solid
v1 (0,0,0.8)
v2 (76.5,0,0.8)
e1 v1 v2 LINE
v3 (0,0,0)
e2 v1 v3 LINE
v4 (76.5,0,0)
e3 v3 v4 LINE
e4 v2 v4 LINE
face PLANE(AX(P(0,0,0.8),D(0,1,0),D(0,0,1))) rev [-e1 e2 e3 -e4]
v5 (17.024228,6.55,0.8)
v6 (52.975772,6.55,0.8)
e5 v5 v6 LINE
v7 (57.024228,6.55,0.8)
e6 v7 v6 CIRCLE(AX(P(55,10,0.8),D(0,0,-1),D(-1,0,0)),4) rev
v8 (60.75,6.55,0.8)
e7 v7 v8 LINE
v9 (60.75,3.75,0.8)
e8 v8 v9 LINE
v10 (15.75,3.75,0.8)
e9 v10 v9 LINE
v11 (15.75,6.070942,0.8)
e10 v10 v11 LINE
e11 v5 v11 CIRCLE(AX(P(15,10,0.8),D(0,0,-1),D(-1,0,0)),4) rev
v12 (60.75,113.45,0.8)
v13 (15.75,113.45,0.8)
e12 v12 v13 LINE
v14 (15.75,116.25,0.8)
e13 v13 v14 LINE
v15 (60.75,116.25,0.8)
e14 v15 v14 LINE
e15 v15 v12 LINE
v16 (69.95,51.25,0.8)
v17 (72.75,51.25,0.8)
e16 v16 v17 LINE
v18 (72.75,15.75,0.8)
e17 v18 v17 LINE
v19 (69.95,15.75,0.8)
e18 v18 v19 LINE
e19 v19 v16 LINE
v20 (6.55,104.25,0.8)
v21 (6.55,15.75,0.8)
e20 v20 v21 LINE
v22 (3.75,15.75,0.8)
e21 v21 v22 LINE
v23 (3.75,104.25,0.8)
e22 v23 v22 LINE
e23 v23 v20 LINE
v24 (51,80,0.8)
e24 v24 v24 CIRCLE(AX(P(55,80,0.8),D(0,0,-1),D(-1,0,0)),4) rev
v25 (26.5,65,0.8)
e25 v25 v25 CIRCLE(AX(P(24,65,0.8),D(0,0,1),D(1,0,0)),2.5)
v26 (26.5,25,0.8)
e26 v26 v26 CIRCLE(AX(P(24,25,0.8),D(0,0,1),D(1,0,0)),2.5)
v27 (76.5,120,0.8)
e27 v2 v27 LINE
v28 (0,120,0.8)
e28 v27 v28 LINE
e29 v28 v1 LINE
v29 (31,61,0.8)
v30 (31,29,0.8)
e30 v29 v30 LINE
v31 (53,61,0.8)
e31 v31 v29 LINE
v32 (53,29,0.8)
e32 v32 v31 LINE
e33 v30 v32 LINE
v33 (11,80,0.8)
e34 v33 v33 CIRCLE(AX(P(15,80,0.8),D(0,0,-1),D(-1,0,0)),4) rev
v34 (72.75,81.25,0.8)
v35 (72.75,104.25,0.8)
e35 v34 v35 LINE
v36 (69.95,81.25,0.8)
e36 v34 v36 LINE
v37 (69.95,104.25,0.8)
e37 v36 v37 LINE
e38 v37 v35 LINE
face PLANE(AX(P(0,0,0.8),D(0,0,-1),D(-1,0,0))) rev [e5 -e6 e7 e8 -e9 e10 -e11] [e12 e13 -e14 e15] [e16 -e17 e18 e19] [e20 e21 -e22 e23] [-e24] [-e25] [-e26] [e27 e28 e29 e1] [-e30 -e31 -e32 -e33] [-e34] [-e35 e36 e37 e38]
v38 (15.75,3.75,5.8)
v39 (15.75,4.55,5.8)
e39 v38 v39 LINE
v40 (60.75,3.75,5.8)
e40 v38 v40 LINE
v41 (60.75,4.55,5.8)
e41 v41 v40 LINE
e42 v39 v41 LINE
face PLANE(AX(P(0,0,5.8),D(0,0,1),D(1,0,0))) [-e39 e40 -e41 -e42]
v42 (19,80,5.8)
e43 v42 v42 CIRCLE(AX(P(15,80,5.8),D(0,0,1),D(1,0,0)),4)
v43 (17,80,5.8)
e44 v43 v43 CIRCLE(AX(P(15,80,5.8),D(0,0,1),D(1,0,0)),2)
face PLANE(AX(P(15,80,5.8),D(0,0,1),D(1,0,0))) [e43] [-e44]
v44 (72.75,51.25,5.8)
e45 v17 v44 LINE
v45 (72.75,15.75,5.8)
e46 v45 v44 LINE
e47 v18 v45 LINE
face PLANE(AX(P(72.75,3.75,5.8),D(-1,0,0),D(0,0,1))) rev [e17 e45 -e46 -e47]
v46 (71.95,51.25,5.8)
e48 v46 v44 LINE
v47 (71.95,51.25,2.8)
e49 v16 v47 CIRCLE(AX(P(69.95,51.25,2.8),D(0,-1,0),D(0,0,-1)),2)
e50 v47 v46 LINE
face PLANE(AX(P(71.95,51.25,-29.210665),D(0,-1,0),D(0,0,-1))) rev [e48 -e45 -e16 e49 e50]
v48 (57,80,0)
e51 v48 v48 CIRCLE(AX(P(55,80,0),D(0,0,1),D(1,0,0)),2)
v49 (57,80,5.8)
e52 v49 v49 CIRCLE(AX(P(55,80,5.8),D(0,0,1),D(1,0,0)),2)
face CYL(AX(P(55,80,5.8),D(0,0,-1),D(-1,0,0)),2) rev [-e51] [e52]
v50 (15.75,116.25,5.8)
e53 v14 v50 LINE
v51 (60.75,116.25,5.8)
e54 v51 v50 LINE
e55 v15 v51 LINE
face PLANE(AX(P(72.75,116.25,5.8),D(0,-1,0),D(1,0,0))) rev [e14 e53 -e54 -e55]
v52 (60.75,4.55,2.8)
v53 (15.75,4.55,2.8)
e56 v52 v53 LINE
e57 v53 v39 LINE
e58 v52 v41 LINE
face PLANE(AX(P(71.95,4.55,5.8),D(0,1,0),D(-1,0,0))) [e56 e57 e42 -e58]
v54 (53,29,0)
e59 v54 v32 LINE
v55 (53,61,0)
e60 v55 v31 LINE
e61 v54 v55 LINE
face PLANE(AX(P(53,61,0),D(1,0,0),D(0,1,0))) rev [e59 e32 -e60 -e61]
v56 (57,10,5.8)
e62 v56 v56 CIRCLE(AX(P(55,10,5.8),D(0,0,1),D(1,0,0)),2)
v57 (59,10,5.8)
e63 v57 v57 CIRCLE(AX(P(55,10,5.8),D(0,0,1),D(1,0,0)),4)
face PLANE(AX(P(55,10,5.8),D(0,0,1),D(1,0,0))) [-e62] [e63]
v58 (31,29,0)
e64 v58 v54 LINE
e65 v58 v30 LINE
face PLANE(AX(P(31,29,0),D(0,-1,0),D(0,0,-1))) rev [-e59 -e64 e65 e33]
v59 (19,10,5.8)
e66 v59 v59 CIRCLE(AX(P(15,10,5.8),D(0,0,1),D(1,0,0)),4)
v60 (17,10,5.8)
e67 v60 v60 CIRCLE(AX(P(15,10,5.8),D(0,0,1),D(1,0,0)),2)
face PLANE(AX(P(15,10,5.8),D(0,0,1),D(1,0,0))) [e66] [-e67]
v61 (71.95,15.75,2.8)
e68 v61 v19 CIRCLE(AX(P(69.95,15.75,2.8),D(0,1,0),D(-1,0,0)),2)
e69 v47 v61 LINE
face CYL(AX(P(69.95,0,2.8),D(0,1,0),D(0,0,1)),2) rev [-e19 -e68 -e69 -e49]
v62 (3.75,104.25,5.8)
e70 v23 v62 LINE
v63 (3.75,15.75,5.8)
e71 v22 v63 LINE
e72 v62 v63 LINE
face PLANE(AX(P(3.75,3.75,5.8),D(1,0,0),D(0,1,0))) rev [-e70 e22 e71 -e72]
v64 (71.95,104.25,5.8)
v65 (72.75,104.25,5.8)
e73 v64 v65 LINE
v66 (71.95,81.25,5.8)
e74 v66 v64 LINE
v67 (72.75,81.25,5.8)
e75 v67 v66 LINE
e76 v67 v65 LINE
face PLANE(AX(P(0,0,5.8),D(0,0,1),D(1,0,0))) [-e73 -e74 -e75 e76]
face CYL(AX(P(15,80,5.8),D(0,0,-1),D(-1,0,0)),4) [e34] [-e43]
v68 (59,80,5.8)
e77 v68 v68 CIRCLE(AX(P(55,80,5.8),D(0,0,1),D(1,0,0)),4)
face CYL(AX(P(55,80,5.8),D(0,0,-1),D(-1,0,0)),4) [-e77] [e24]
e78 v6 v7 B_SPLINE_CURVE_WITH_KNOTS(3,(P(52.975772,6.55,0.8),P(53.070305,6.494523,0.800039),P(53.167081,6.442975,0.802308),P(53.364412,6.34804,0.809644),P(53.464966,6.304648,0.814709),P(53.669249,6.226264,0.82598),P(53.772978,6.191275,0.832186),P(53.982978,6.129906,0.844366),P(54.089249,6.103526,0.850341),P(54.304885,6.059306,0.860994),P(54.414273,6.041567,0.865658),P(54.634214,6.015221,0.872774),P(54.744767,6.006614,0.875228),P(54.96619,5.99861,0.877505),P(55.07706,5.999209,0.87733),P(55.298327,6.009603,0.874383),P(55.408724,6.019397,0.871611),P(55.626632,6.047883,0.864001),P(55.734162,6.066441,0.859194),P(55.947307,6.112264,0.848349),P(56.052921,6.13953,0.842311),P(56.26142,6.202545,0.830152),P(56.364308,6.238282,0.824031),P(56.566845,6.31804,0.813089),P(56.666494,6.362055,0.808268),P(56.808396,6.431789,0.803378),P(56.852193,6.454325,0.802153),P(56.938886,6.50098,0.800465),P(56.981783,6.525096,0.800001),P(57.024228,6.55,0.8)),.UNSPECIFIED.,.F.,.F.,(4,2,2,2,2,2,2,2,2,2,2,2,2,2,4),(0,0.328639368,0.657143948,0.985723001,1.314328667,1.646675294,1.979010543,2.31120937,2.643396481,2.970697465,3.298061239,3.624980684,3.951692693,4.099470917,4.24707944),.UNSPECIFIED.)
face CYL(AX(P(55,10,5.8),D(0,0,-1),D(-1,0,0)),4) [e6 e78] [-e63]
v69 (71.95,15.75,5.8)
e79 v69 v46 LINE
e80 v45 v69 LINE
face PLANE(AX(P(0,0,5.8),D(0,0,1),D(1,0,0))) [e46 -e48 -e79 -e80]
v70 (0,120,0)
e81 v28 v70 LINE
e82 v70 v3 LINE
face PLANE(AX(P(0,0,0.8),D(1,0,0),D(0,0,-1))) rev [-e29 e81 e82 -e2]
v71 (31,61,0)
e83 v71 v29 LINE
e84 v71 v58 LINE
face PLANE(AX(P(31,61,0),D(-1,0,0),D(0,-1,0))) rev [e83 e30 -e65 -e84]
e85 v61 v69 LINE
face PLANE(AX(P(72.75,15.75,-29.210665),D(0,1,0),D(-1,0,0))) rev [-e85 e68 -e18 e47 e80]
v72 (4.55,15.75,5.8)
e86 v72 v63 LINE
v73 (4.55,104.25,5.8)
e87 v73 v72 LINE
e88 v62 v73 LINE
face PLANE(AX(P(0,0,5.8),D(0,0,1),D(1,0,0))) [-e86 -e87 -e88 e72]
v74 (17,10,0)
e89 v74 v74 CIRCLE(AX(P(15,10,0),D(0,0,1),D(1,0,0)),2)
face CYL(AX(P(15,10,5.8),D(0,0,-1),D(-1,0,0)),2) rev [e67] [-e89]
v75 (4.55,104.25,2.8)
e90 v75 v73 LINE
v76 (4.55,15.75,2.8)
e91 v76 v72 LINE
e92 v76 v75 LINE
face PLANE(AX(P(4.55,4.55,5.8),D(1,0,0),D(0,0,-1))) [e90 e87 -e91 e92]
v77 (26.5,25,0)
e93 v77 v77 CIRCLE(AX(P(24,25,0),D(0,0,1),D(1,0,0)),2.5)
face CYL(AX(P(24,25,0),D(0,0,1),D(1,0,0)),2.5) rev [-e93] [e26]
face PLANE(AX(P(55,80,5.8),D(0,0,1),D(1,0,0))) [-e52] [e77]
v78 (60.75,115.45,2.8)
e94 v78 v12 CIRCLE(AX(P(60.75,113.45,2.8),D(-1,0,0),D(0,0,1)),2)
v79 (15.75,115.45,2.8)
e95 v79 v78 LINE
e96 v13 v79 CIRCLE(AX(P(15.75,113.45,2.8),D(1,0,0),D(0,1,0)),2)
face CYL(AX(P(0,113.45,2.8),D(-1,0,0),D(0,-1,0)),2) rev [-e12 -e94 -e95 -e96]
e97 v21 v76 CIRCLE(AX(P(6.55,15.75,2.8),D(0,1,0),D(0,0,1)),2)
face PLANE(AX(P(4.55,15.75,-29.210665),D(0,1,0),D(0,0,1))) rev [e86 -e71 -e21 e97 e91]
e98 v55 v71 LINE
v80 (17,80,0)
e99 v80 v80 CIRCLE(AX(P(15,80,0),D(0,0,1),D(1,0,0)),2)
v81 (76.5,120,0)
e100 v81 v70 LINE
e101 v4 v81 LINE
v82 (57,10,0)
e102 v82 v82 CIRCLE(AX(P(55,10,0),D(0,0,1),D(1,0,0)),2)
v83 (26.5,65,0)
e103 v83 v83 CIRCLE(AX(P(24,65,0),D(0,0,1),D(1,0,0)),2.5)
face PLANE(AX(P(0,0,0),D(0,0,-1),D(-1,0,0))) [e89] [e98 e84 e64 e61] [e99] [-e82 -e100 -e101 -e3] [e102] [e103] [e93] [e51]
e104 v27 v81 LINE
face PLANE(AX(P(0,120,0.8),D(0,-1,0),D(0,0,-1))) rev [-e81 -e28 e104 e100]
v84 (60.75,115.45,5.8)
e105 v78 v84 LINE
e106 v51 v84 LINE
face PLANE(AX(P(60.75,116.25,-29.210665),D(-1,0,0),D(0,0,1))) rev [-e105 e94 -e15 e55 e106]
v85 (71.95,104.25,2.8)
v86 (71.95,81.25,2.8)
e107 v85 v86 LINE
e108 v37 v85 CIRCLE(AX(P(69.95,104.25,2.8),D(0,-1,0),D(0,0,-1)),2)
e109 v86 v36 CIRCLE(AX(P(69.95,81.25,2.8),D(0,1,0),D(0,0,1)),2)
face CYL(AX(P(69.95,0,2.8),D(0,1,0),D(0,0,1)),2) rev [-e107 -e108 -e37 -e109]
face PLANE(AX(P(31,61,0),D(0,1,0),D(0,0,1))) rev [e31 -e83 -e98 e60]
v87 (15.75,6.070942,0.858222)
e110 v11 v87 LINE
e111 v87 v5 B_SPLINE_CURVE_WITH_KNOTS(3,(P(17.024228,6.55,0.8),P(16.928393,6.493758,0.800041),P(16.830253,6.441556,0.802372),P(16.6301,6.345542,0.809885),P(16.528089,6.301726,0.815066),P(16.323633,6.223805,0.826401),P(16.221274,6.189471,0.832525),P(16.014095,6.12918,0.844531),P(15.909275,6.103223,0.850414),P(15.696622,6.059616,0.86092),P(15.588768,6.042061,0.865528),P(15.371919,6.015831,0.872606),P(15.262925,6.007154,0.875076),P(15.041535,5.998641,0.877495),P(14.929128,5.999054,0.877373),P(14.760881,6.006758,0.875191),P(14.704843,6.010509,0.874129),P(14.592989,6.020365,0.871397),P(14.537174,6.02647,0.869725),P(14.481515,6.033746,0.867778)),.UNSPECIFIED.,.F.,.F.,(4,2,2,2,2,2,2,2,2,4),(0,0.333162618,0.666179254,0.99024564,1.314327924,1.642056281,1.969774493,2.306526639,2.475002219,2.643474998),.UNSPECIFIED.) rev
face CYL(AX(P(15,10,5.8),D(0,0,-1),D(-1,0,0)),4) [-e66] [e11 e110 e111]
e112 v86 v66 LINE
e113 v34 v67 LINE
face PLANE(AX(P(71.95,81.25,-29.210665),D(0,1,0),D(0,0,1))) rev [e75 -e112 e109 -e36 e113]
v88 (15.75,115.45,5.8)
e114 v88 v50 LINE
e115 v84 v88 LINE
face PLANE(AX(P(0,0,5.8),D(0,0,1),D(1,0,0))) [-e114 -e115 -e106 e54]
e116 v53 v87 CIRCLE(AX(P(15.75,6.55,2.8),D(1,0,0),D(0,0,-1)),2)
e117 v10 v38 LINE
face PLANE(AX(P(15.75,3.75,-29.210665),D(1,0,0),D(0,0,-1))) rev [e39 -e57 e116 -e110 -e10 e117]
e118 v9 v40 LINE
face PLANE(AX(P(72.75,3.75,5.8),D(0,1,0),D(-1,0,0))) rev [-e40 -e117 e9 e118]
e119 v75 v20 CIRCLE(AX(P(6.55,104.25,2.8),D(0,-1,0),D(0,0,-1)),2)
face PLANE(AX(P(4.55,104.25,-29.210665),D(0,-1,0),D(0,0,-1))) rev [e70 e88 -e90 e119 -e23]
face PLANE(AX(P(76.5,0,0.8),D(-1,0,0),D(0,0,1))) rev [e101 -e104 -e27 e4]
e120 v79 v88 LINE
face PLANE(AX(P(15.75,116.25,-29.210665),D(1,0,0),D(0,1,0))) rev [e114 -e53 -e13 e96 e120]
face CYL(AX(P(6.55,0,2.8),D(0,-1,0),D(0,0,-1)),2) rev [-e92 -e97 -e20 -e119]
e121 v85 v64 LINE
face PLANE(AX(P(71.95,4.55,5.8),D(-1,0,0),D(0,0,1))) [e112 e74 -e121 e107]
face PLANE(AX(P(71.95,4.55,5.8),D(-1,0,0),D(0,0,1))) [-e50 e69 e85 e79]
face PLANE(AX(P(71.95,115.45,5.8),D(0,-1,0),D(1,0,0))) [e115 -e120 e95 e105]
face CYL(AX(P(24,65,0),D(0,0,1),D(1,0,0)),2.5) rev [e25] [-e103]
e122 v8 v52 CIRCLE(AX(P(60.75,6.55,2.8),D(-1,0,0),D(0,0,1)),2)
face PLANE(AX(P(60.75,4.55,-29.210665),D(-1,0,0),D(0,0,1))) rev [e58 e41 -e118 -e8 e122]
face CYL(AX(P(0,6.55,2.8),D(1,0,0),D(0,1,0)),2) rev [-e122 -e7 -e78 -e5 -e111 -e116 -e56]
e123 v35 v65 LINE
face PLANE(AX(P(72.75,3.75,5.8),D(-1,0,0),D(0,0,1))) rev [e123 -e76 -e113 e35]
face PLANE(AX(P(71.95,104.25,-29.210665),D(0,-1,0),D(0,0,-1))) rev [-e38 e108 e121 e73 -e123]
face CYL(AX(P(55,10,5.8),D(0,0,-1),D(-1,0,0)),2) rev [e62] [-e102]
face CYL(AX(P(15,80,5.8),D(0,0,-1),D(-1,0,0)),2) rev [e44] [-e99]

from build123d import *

# Parameters (mm, degrees)
SKETCH_1_W          = 76.5
SKETCH_1_H          = 120
EXTRUDE_1_DEPTH     = 0.8
SKETCH_5_R          = 2.5
CUT_EXTRUDE_2_DEPTH = 143.31264877
SKETCH_7_R          = 4
SKETCH_7_R_2        = 2
EXTRUDE_2_DEPTH     = 5
SKETCH_8_W          = 22
SKETCH_8_H          = 32
CUT_EXTRUDE_4_DEPTH = 143.398209258
SKETCH_9_R          = 2
CUT_EXTRUDE_5_DEPTH = 143.398209258
SKETCH_10_W         = 69
SKETCH_10_H         = 112.5
SKETCH_10_W_2       = 67.4
SKETCH_10_H_2       = 110.9
EXTRUDE_4_DEPTH     = 5
SKETCH_11_W         = 0.8
SKETCH_11_H         = 30
CUT_EXTRUDE_6_DEPTH = 5
FILLET_1_R          = 2


with BuildPart() as part:
    # ｽｹｯﾁ1 → ﾎﾞｽ - 押し出し1 (new body)
    with BuildSketch(Plane.XY):
        with Locations((38.25, 60)):
            Rectangle(SKETCH_1_W, SKETCH_1_H)
    extrude(amount=EXTRUDE_1_DEPTH)

    # ｽｹｯﾁ5 → ｶｯﾄ - 押し出し2 (cut, through all)
    with BuildSketch(Plane.XY.offset(0.8)):
        with Locations((24, 65)):
            Circle(SKETCH_5_R)
        with Locations((24, 25)):
            Circle(SKETCH_5_R)
    extrude(amount=-CUT_EXTRUDE_2_DEPTH, mode=Mode.SUBTRACT)

    # ｽｹｯﾁ7 → ﾎﾞｽ - 押し出し2 (add)
    # profile 1 of 4: a face of its own
    with BuildSketch(Plane.XY.offset(0.8)):
        with Locations(Location((55, 80, 0), (0, 0, 180))):
            Circle(SKETCH_7_R)
        with Locations((55, 80)):
            Circle(SKETCH_7_R_2, mode=Mode.SUBTRACT)
    # profile 2 of 4: a face of its own
    with BuildSketch(Plane.XY.offset(0.8)):
        with Locations(Location((15, 80, 0), (0, 0, 180))):
            Circle(SKETCH_7_R)
        with Locations((15, 80)):
            Circle(SKETCH_7_R_2, mode=Mode.SUBTRACT)
    # profile 3 of 4: a face of its own
    with BuildSketch(Plane.XY.offset(0.8)):
        with Locations(Location((55, 10, 0), (0, 0, 180))):
            Circle(SKETCH_7_R)
        with Locations((55, 10)):
            Circle(SKETCH_7_R_2, mode=Mode.SUBTRACT)
    # profile 4 of 4: a face of its own
    with BuildSketch(Plane.XY.offset(0.8)):
        with Locations(Location((15, 10, 0), (0, 0, 180))):
            Circle(SKETCH_7_R)
        with Locations((15, 10)):
            Circle(SKETCH_7_R_2, mode=Mode.SUBTRACT)
    extrude(amount=EXTRUDE_2_DEPTH)

    # ｽｹｯﾁ8 → ｶｯﾄ - 押し出し4 (cut, through all)
    with BuildSketch(Plane.XY.offset(0.8)):
        with Locations((42, 45)):
            Rectangle(SKETCH_8_W, SKETCH_8_H)
    extrude(amount=-CUT_EXTRUDE_4_DEPTH, mode=Mode.SUBTRACT)

    # ｽｹｯﾁ9 → ｶｯﾄ - 押し出し5 (cut, through all)
    with BuildSketch(Plane.XY.offset(0.8)):
        with Locations((15, 80)):
            Circle(SKETCH_9_R)
        with Locations((55, 80)):
            Circle(SKETCH_9_R)
        with Locations((55, 10)):
            Circle(SKETCH_9_R)
        with Locations((15, 10)):
            Circle(SKETCH_9_R)
    extrude(amount=-CUT_EXTRUDE_5_DEPTH, mode=Mode.SUBTRACT)

    # ｽｹｯﾁ10 → ﾎﾞｽ - 押し出し4 (add)
    with BuildSketch(Plane.XY.offset(0.8)):
        with Locations((38.25, 60)):
            Rectangle(SKETCH_10_W, SKETCH_10_H)
        with Locations((38.25, 60)):
            Rectangle(SKETCH_10_W_2, SKETCH_10_H_2, mode=Mode.SUBTRACT)
    extrude(amount=EXTRUDE_4_DEPTH)

    # ｽｹｯﾁ11 → ｶｯﾄ - 押し出し6 (cut)
    with BuildSketch(Plane.XY.offset(5.8)):
        with Locations((72.35, 66.25)):
            Rectangle(SKETCH_11_W, SKETCH_11_H)
        Polygon((3.75, 116.25), (15.75, 116.25), (15.75, 115.45), (4.55, 115.45), (4.55, 104.25), (3.75, 104.25), align=None)
        Polygon((72.75, 104.25), (72.75, 116.25), (60.75, 116.25), (60.75, 115.45), (71.95, 115.45), (71.95, 104.25), align=None)
        Polygon((72.75, 3.75), (72.75, 15.75), (71.95, 15.75), (71.95, 4.55), (60.75, 4.55), (60.75, 3.75), align=None)
        Polygon((3.75, 3.75), (15.75, 3.75), (15.75, 4.55), (4.55, 4.55), (4.55, 15.75), (3.75, 15.75), align=None)
    extrude(amount=-CUT_EXTRUDE_6_DEPTH, mode=Mode.SUBTRACT)

    # ﾌｨﾚｯﾄ1
    # the kernel refuses this fillet: 2 mm, written as the material it adds along each edge
    with BuildSketch(Plane(origin=(60.75, 4.55, 0.8), x_dir=(0, 1, 0), z_dir=(-1, 0, 0)), Plane(origin=(15.75, 115.45, 0.8), x_dir=(0, -1, 0), z_dir=(1, 0, 0))) as fillet_1_piece_1:
        with BuildLine():
            CenterArc((FILLET_1_R, -FILLET_1_R), FILLET_1_R, 90, 90)
            Line((0, -FILLET_1_R), (0, 0))
            Line((0, 0), (FILLET_1_R, 0))
        make_face()
    extrude(amount=45)
    with BuildSketch(Plane(origin=(4.55, 15.75, 0.8), x_dir=(1, 0, 0), z_dir=(0, 1, 0))) as fillet_1_piece_2:
        with BuildLine():
            CenterArc((FILLET_1_R, -FILLET_1_R), FILLET_1_R, 90, 90)
            Line((0, -FILLET_1_R), (0, 0))
            Line((0, 0), (FILLET_1_R, 0))
        make_face()
    extrude(amount=88.5)
    with BuildSketch(Plane(origin=(71.95, 51.25, 0.8), x_dir=(-1, 0, 0), z_dir=(0, -1, 0))) as fillet_1_piece_3:
        with BuildLine():
            CenterArc((FILLET_1_R, -FILLET_1_R), FILLET_1_R, 90, 90)
            Line((0, -FILLET_1_R), (0, 0))
            Line((0, 0), (FILLET_1_R, 0))
        make_face()
    extrude(amount=35.5)
    with BuildSketch(Plane(origin=(71.95, 104.25, 0.8), x_dir=(-1, 0, 0), z_dir=(0, -1, 0))) as fillet_1_piece_4:
        with BuildLine():
            CenterArc((FILLET_1_R, -FILLET_1_R), FILLET_1_R, 90, 90)
            Line((0, -FILLET_1_R), (0, 0))
            Line((0, 0), (FILLET_1_R, 0))
        make_face()
    extrude(amount=23)


solid = part.part
